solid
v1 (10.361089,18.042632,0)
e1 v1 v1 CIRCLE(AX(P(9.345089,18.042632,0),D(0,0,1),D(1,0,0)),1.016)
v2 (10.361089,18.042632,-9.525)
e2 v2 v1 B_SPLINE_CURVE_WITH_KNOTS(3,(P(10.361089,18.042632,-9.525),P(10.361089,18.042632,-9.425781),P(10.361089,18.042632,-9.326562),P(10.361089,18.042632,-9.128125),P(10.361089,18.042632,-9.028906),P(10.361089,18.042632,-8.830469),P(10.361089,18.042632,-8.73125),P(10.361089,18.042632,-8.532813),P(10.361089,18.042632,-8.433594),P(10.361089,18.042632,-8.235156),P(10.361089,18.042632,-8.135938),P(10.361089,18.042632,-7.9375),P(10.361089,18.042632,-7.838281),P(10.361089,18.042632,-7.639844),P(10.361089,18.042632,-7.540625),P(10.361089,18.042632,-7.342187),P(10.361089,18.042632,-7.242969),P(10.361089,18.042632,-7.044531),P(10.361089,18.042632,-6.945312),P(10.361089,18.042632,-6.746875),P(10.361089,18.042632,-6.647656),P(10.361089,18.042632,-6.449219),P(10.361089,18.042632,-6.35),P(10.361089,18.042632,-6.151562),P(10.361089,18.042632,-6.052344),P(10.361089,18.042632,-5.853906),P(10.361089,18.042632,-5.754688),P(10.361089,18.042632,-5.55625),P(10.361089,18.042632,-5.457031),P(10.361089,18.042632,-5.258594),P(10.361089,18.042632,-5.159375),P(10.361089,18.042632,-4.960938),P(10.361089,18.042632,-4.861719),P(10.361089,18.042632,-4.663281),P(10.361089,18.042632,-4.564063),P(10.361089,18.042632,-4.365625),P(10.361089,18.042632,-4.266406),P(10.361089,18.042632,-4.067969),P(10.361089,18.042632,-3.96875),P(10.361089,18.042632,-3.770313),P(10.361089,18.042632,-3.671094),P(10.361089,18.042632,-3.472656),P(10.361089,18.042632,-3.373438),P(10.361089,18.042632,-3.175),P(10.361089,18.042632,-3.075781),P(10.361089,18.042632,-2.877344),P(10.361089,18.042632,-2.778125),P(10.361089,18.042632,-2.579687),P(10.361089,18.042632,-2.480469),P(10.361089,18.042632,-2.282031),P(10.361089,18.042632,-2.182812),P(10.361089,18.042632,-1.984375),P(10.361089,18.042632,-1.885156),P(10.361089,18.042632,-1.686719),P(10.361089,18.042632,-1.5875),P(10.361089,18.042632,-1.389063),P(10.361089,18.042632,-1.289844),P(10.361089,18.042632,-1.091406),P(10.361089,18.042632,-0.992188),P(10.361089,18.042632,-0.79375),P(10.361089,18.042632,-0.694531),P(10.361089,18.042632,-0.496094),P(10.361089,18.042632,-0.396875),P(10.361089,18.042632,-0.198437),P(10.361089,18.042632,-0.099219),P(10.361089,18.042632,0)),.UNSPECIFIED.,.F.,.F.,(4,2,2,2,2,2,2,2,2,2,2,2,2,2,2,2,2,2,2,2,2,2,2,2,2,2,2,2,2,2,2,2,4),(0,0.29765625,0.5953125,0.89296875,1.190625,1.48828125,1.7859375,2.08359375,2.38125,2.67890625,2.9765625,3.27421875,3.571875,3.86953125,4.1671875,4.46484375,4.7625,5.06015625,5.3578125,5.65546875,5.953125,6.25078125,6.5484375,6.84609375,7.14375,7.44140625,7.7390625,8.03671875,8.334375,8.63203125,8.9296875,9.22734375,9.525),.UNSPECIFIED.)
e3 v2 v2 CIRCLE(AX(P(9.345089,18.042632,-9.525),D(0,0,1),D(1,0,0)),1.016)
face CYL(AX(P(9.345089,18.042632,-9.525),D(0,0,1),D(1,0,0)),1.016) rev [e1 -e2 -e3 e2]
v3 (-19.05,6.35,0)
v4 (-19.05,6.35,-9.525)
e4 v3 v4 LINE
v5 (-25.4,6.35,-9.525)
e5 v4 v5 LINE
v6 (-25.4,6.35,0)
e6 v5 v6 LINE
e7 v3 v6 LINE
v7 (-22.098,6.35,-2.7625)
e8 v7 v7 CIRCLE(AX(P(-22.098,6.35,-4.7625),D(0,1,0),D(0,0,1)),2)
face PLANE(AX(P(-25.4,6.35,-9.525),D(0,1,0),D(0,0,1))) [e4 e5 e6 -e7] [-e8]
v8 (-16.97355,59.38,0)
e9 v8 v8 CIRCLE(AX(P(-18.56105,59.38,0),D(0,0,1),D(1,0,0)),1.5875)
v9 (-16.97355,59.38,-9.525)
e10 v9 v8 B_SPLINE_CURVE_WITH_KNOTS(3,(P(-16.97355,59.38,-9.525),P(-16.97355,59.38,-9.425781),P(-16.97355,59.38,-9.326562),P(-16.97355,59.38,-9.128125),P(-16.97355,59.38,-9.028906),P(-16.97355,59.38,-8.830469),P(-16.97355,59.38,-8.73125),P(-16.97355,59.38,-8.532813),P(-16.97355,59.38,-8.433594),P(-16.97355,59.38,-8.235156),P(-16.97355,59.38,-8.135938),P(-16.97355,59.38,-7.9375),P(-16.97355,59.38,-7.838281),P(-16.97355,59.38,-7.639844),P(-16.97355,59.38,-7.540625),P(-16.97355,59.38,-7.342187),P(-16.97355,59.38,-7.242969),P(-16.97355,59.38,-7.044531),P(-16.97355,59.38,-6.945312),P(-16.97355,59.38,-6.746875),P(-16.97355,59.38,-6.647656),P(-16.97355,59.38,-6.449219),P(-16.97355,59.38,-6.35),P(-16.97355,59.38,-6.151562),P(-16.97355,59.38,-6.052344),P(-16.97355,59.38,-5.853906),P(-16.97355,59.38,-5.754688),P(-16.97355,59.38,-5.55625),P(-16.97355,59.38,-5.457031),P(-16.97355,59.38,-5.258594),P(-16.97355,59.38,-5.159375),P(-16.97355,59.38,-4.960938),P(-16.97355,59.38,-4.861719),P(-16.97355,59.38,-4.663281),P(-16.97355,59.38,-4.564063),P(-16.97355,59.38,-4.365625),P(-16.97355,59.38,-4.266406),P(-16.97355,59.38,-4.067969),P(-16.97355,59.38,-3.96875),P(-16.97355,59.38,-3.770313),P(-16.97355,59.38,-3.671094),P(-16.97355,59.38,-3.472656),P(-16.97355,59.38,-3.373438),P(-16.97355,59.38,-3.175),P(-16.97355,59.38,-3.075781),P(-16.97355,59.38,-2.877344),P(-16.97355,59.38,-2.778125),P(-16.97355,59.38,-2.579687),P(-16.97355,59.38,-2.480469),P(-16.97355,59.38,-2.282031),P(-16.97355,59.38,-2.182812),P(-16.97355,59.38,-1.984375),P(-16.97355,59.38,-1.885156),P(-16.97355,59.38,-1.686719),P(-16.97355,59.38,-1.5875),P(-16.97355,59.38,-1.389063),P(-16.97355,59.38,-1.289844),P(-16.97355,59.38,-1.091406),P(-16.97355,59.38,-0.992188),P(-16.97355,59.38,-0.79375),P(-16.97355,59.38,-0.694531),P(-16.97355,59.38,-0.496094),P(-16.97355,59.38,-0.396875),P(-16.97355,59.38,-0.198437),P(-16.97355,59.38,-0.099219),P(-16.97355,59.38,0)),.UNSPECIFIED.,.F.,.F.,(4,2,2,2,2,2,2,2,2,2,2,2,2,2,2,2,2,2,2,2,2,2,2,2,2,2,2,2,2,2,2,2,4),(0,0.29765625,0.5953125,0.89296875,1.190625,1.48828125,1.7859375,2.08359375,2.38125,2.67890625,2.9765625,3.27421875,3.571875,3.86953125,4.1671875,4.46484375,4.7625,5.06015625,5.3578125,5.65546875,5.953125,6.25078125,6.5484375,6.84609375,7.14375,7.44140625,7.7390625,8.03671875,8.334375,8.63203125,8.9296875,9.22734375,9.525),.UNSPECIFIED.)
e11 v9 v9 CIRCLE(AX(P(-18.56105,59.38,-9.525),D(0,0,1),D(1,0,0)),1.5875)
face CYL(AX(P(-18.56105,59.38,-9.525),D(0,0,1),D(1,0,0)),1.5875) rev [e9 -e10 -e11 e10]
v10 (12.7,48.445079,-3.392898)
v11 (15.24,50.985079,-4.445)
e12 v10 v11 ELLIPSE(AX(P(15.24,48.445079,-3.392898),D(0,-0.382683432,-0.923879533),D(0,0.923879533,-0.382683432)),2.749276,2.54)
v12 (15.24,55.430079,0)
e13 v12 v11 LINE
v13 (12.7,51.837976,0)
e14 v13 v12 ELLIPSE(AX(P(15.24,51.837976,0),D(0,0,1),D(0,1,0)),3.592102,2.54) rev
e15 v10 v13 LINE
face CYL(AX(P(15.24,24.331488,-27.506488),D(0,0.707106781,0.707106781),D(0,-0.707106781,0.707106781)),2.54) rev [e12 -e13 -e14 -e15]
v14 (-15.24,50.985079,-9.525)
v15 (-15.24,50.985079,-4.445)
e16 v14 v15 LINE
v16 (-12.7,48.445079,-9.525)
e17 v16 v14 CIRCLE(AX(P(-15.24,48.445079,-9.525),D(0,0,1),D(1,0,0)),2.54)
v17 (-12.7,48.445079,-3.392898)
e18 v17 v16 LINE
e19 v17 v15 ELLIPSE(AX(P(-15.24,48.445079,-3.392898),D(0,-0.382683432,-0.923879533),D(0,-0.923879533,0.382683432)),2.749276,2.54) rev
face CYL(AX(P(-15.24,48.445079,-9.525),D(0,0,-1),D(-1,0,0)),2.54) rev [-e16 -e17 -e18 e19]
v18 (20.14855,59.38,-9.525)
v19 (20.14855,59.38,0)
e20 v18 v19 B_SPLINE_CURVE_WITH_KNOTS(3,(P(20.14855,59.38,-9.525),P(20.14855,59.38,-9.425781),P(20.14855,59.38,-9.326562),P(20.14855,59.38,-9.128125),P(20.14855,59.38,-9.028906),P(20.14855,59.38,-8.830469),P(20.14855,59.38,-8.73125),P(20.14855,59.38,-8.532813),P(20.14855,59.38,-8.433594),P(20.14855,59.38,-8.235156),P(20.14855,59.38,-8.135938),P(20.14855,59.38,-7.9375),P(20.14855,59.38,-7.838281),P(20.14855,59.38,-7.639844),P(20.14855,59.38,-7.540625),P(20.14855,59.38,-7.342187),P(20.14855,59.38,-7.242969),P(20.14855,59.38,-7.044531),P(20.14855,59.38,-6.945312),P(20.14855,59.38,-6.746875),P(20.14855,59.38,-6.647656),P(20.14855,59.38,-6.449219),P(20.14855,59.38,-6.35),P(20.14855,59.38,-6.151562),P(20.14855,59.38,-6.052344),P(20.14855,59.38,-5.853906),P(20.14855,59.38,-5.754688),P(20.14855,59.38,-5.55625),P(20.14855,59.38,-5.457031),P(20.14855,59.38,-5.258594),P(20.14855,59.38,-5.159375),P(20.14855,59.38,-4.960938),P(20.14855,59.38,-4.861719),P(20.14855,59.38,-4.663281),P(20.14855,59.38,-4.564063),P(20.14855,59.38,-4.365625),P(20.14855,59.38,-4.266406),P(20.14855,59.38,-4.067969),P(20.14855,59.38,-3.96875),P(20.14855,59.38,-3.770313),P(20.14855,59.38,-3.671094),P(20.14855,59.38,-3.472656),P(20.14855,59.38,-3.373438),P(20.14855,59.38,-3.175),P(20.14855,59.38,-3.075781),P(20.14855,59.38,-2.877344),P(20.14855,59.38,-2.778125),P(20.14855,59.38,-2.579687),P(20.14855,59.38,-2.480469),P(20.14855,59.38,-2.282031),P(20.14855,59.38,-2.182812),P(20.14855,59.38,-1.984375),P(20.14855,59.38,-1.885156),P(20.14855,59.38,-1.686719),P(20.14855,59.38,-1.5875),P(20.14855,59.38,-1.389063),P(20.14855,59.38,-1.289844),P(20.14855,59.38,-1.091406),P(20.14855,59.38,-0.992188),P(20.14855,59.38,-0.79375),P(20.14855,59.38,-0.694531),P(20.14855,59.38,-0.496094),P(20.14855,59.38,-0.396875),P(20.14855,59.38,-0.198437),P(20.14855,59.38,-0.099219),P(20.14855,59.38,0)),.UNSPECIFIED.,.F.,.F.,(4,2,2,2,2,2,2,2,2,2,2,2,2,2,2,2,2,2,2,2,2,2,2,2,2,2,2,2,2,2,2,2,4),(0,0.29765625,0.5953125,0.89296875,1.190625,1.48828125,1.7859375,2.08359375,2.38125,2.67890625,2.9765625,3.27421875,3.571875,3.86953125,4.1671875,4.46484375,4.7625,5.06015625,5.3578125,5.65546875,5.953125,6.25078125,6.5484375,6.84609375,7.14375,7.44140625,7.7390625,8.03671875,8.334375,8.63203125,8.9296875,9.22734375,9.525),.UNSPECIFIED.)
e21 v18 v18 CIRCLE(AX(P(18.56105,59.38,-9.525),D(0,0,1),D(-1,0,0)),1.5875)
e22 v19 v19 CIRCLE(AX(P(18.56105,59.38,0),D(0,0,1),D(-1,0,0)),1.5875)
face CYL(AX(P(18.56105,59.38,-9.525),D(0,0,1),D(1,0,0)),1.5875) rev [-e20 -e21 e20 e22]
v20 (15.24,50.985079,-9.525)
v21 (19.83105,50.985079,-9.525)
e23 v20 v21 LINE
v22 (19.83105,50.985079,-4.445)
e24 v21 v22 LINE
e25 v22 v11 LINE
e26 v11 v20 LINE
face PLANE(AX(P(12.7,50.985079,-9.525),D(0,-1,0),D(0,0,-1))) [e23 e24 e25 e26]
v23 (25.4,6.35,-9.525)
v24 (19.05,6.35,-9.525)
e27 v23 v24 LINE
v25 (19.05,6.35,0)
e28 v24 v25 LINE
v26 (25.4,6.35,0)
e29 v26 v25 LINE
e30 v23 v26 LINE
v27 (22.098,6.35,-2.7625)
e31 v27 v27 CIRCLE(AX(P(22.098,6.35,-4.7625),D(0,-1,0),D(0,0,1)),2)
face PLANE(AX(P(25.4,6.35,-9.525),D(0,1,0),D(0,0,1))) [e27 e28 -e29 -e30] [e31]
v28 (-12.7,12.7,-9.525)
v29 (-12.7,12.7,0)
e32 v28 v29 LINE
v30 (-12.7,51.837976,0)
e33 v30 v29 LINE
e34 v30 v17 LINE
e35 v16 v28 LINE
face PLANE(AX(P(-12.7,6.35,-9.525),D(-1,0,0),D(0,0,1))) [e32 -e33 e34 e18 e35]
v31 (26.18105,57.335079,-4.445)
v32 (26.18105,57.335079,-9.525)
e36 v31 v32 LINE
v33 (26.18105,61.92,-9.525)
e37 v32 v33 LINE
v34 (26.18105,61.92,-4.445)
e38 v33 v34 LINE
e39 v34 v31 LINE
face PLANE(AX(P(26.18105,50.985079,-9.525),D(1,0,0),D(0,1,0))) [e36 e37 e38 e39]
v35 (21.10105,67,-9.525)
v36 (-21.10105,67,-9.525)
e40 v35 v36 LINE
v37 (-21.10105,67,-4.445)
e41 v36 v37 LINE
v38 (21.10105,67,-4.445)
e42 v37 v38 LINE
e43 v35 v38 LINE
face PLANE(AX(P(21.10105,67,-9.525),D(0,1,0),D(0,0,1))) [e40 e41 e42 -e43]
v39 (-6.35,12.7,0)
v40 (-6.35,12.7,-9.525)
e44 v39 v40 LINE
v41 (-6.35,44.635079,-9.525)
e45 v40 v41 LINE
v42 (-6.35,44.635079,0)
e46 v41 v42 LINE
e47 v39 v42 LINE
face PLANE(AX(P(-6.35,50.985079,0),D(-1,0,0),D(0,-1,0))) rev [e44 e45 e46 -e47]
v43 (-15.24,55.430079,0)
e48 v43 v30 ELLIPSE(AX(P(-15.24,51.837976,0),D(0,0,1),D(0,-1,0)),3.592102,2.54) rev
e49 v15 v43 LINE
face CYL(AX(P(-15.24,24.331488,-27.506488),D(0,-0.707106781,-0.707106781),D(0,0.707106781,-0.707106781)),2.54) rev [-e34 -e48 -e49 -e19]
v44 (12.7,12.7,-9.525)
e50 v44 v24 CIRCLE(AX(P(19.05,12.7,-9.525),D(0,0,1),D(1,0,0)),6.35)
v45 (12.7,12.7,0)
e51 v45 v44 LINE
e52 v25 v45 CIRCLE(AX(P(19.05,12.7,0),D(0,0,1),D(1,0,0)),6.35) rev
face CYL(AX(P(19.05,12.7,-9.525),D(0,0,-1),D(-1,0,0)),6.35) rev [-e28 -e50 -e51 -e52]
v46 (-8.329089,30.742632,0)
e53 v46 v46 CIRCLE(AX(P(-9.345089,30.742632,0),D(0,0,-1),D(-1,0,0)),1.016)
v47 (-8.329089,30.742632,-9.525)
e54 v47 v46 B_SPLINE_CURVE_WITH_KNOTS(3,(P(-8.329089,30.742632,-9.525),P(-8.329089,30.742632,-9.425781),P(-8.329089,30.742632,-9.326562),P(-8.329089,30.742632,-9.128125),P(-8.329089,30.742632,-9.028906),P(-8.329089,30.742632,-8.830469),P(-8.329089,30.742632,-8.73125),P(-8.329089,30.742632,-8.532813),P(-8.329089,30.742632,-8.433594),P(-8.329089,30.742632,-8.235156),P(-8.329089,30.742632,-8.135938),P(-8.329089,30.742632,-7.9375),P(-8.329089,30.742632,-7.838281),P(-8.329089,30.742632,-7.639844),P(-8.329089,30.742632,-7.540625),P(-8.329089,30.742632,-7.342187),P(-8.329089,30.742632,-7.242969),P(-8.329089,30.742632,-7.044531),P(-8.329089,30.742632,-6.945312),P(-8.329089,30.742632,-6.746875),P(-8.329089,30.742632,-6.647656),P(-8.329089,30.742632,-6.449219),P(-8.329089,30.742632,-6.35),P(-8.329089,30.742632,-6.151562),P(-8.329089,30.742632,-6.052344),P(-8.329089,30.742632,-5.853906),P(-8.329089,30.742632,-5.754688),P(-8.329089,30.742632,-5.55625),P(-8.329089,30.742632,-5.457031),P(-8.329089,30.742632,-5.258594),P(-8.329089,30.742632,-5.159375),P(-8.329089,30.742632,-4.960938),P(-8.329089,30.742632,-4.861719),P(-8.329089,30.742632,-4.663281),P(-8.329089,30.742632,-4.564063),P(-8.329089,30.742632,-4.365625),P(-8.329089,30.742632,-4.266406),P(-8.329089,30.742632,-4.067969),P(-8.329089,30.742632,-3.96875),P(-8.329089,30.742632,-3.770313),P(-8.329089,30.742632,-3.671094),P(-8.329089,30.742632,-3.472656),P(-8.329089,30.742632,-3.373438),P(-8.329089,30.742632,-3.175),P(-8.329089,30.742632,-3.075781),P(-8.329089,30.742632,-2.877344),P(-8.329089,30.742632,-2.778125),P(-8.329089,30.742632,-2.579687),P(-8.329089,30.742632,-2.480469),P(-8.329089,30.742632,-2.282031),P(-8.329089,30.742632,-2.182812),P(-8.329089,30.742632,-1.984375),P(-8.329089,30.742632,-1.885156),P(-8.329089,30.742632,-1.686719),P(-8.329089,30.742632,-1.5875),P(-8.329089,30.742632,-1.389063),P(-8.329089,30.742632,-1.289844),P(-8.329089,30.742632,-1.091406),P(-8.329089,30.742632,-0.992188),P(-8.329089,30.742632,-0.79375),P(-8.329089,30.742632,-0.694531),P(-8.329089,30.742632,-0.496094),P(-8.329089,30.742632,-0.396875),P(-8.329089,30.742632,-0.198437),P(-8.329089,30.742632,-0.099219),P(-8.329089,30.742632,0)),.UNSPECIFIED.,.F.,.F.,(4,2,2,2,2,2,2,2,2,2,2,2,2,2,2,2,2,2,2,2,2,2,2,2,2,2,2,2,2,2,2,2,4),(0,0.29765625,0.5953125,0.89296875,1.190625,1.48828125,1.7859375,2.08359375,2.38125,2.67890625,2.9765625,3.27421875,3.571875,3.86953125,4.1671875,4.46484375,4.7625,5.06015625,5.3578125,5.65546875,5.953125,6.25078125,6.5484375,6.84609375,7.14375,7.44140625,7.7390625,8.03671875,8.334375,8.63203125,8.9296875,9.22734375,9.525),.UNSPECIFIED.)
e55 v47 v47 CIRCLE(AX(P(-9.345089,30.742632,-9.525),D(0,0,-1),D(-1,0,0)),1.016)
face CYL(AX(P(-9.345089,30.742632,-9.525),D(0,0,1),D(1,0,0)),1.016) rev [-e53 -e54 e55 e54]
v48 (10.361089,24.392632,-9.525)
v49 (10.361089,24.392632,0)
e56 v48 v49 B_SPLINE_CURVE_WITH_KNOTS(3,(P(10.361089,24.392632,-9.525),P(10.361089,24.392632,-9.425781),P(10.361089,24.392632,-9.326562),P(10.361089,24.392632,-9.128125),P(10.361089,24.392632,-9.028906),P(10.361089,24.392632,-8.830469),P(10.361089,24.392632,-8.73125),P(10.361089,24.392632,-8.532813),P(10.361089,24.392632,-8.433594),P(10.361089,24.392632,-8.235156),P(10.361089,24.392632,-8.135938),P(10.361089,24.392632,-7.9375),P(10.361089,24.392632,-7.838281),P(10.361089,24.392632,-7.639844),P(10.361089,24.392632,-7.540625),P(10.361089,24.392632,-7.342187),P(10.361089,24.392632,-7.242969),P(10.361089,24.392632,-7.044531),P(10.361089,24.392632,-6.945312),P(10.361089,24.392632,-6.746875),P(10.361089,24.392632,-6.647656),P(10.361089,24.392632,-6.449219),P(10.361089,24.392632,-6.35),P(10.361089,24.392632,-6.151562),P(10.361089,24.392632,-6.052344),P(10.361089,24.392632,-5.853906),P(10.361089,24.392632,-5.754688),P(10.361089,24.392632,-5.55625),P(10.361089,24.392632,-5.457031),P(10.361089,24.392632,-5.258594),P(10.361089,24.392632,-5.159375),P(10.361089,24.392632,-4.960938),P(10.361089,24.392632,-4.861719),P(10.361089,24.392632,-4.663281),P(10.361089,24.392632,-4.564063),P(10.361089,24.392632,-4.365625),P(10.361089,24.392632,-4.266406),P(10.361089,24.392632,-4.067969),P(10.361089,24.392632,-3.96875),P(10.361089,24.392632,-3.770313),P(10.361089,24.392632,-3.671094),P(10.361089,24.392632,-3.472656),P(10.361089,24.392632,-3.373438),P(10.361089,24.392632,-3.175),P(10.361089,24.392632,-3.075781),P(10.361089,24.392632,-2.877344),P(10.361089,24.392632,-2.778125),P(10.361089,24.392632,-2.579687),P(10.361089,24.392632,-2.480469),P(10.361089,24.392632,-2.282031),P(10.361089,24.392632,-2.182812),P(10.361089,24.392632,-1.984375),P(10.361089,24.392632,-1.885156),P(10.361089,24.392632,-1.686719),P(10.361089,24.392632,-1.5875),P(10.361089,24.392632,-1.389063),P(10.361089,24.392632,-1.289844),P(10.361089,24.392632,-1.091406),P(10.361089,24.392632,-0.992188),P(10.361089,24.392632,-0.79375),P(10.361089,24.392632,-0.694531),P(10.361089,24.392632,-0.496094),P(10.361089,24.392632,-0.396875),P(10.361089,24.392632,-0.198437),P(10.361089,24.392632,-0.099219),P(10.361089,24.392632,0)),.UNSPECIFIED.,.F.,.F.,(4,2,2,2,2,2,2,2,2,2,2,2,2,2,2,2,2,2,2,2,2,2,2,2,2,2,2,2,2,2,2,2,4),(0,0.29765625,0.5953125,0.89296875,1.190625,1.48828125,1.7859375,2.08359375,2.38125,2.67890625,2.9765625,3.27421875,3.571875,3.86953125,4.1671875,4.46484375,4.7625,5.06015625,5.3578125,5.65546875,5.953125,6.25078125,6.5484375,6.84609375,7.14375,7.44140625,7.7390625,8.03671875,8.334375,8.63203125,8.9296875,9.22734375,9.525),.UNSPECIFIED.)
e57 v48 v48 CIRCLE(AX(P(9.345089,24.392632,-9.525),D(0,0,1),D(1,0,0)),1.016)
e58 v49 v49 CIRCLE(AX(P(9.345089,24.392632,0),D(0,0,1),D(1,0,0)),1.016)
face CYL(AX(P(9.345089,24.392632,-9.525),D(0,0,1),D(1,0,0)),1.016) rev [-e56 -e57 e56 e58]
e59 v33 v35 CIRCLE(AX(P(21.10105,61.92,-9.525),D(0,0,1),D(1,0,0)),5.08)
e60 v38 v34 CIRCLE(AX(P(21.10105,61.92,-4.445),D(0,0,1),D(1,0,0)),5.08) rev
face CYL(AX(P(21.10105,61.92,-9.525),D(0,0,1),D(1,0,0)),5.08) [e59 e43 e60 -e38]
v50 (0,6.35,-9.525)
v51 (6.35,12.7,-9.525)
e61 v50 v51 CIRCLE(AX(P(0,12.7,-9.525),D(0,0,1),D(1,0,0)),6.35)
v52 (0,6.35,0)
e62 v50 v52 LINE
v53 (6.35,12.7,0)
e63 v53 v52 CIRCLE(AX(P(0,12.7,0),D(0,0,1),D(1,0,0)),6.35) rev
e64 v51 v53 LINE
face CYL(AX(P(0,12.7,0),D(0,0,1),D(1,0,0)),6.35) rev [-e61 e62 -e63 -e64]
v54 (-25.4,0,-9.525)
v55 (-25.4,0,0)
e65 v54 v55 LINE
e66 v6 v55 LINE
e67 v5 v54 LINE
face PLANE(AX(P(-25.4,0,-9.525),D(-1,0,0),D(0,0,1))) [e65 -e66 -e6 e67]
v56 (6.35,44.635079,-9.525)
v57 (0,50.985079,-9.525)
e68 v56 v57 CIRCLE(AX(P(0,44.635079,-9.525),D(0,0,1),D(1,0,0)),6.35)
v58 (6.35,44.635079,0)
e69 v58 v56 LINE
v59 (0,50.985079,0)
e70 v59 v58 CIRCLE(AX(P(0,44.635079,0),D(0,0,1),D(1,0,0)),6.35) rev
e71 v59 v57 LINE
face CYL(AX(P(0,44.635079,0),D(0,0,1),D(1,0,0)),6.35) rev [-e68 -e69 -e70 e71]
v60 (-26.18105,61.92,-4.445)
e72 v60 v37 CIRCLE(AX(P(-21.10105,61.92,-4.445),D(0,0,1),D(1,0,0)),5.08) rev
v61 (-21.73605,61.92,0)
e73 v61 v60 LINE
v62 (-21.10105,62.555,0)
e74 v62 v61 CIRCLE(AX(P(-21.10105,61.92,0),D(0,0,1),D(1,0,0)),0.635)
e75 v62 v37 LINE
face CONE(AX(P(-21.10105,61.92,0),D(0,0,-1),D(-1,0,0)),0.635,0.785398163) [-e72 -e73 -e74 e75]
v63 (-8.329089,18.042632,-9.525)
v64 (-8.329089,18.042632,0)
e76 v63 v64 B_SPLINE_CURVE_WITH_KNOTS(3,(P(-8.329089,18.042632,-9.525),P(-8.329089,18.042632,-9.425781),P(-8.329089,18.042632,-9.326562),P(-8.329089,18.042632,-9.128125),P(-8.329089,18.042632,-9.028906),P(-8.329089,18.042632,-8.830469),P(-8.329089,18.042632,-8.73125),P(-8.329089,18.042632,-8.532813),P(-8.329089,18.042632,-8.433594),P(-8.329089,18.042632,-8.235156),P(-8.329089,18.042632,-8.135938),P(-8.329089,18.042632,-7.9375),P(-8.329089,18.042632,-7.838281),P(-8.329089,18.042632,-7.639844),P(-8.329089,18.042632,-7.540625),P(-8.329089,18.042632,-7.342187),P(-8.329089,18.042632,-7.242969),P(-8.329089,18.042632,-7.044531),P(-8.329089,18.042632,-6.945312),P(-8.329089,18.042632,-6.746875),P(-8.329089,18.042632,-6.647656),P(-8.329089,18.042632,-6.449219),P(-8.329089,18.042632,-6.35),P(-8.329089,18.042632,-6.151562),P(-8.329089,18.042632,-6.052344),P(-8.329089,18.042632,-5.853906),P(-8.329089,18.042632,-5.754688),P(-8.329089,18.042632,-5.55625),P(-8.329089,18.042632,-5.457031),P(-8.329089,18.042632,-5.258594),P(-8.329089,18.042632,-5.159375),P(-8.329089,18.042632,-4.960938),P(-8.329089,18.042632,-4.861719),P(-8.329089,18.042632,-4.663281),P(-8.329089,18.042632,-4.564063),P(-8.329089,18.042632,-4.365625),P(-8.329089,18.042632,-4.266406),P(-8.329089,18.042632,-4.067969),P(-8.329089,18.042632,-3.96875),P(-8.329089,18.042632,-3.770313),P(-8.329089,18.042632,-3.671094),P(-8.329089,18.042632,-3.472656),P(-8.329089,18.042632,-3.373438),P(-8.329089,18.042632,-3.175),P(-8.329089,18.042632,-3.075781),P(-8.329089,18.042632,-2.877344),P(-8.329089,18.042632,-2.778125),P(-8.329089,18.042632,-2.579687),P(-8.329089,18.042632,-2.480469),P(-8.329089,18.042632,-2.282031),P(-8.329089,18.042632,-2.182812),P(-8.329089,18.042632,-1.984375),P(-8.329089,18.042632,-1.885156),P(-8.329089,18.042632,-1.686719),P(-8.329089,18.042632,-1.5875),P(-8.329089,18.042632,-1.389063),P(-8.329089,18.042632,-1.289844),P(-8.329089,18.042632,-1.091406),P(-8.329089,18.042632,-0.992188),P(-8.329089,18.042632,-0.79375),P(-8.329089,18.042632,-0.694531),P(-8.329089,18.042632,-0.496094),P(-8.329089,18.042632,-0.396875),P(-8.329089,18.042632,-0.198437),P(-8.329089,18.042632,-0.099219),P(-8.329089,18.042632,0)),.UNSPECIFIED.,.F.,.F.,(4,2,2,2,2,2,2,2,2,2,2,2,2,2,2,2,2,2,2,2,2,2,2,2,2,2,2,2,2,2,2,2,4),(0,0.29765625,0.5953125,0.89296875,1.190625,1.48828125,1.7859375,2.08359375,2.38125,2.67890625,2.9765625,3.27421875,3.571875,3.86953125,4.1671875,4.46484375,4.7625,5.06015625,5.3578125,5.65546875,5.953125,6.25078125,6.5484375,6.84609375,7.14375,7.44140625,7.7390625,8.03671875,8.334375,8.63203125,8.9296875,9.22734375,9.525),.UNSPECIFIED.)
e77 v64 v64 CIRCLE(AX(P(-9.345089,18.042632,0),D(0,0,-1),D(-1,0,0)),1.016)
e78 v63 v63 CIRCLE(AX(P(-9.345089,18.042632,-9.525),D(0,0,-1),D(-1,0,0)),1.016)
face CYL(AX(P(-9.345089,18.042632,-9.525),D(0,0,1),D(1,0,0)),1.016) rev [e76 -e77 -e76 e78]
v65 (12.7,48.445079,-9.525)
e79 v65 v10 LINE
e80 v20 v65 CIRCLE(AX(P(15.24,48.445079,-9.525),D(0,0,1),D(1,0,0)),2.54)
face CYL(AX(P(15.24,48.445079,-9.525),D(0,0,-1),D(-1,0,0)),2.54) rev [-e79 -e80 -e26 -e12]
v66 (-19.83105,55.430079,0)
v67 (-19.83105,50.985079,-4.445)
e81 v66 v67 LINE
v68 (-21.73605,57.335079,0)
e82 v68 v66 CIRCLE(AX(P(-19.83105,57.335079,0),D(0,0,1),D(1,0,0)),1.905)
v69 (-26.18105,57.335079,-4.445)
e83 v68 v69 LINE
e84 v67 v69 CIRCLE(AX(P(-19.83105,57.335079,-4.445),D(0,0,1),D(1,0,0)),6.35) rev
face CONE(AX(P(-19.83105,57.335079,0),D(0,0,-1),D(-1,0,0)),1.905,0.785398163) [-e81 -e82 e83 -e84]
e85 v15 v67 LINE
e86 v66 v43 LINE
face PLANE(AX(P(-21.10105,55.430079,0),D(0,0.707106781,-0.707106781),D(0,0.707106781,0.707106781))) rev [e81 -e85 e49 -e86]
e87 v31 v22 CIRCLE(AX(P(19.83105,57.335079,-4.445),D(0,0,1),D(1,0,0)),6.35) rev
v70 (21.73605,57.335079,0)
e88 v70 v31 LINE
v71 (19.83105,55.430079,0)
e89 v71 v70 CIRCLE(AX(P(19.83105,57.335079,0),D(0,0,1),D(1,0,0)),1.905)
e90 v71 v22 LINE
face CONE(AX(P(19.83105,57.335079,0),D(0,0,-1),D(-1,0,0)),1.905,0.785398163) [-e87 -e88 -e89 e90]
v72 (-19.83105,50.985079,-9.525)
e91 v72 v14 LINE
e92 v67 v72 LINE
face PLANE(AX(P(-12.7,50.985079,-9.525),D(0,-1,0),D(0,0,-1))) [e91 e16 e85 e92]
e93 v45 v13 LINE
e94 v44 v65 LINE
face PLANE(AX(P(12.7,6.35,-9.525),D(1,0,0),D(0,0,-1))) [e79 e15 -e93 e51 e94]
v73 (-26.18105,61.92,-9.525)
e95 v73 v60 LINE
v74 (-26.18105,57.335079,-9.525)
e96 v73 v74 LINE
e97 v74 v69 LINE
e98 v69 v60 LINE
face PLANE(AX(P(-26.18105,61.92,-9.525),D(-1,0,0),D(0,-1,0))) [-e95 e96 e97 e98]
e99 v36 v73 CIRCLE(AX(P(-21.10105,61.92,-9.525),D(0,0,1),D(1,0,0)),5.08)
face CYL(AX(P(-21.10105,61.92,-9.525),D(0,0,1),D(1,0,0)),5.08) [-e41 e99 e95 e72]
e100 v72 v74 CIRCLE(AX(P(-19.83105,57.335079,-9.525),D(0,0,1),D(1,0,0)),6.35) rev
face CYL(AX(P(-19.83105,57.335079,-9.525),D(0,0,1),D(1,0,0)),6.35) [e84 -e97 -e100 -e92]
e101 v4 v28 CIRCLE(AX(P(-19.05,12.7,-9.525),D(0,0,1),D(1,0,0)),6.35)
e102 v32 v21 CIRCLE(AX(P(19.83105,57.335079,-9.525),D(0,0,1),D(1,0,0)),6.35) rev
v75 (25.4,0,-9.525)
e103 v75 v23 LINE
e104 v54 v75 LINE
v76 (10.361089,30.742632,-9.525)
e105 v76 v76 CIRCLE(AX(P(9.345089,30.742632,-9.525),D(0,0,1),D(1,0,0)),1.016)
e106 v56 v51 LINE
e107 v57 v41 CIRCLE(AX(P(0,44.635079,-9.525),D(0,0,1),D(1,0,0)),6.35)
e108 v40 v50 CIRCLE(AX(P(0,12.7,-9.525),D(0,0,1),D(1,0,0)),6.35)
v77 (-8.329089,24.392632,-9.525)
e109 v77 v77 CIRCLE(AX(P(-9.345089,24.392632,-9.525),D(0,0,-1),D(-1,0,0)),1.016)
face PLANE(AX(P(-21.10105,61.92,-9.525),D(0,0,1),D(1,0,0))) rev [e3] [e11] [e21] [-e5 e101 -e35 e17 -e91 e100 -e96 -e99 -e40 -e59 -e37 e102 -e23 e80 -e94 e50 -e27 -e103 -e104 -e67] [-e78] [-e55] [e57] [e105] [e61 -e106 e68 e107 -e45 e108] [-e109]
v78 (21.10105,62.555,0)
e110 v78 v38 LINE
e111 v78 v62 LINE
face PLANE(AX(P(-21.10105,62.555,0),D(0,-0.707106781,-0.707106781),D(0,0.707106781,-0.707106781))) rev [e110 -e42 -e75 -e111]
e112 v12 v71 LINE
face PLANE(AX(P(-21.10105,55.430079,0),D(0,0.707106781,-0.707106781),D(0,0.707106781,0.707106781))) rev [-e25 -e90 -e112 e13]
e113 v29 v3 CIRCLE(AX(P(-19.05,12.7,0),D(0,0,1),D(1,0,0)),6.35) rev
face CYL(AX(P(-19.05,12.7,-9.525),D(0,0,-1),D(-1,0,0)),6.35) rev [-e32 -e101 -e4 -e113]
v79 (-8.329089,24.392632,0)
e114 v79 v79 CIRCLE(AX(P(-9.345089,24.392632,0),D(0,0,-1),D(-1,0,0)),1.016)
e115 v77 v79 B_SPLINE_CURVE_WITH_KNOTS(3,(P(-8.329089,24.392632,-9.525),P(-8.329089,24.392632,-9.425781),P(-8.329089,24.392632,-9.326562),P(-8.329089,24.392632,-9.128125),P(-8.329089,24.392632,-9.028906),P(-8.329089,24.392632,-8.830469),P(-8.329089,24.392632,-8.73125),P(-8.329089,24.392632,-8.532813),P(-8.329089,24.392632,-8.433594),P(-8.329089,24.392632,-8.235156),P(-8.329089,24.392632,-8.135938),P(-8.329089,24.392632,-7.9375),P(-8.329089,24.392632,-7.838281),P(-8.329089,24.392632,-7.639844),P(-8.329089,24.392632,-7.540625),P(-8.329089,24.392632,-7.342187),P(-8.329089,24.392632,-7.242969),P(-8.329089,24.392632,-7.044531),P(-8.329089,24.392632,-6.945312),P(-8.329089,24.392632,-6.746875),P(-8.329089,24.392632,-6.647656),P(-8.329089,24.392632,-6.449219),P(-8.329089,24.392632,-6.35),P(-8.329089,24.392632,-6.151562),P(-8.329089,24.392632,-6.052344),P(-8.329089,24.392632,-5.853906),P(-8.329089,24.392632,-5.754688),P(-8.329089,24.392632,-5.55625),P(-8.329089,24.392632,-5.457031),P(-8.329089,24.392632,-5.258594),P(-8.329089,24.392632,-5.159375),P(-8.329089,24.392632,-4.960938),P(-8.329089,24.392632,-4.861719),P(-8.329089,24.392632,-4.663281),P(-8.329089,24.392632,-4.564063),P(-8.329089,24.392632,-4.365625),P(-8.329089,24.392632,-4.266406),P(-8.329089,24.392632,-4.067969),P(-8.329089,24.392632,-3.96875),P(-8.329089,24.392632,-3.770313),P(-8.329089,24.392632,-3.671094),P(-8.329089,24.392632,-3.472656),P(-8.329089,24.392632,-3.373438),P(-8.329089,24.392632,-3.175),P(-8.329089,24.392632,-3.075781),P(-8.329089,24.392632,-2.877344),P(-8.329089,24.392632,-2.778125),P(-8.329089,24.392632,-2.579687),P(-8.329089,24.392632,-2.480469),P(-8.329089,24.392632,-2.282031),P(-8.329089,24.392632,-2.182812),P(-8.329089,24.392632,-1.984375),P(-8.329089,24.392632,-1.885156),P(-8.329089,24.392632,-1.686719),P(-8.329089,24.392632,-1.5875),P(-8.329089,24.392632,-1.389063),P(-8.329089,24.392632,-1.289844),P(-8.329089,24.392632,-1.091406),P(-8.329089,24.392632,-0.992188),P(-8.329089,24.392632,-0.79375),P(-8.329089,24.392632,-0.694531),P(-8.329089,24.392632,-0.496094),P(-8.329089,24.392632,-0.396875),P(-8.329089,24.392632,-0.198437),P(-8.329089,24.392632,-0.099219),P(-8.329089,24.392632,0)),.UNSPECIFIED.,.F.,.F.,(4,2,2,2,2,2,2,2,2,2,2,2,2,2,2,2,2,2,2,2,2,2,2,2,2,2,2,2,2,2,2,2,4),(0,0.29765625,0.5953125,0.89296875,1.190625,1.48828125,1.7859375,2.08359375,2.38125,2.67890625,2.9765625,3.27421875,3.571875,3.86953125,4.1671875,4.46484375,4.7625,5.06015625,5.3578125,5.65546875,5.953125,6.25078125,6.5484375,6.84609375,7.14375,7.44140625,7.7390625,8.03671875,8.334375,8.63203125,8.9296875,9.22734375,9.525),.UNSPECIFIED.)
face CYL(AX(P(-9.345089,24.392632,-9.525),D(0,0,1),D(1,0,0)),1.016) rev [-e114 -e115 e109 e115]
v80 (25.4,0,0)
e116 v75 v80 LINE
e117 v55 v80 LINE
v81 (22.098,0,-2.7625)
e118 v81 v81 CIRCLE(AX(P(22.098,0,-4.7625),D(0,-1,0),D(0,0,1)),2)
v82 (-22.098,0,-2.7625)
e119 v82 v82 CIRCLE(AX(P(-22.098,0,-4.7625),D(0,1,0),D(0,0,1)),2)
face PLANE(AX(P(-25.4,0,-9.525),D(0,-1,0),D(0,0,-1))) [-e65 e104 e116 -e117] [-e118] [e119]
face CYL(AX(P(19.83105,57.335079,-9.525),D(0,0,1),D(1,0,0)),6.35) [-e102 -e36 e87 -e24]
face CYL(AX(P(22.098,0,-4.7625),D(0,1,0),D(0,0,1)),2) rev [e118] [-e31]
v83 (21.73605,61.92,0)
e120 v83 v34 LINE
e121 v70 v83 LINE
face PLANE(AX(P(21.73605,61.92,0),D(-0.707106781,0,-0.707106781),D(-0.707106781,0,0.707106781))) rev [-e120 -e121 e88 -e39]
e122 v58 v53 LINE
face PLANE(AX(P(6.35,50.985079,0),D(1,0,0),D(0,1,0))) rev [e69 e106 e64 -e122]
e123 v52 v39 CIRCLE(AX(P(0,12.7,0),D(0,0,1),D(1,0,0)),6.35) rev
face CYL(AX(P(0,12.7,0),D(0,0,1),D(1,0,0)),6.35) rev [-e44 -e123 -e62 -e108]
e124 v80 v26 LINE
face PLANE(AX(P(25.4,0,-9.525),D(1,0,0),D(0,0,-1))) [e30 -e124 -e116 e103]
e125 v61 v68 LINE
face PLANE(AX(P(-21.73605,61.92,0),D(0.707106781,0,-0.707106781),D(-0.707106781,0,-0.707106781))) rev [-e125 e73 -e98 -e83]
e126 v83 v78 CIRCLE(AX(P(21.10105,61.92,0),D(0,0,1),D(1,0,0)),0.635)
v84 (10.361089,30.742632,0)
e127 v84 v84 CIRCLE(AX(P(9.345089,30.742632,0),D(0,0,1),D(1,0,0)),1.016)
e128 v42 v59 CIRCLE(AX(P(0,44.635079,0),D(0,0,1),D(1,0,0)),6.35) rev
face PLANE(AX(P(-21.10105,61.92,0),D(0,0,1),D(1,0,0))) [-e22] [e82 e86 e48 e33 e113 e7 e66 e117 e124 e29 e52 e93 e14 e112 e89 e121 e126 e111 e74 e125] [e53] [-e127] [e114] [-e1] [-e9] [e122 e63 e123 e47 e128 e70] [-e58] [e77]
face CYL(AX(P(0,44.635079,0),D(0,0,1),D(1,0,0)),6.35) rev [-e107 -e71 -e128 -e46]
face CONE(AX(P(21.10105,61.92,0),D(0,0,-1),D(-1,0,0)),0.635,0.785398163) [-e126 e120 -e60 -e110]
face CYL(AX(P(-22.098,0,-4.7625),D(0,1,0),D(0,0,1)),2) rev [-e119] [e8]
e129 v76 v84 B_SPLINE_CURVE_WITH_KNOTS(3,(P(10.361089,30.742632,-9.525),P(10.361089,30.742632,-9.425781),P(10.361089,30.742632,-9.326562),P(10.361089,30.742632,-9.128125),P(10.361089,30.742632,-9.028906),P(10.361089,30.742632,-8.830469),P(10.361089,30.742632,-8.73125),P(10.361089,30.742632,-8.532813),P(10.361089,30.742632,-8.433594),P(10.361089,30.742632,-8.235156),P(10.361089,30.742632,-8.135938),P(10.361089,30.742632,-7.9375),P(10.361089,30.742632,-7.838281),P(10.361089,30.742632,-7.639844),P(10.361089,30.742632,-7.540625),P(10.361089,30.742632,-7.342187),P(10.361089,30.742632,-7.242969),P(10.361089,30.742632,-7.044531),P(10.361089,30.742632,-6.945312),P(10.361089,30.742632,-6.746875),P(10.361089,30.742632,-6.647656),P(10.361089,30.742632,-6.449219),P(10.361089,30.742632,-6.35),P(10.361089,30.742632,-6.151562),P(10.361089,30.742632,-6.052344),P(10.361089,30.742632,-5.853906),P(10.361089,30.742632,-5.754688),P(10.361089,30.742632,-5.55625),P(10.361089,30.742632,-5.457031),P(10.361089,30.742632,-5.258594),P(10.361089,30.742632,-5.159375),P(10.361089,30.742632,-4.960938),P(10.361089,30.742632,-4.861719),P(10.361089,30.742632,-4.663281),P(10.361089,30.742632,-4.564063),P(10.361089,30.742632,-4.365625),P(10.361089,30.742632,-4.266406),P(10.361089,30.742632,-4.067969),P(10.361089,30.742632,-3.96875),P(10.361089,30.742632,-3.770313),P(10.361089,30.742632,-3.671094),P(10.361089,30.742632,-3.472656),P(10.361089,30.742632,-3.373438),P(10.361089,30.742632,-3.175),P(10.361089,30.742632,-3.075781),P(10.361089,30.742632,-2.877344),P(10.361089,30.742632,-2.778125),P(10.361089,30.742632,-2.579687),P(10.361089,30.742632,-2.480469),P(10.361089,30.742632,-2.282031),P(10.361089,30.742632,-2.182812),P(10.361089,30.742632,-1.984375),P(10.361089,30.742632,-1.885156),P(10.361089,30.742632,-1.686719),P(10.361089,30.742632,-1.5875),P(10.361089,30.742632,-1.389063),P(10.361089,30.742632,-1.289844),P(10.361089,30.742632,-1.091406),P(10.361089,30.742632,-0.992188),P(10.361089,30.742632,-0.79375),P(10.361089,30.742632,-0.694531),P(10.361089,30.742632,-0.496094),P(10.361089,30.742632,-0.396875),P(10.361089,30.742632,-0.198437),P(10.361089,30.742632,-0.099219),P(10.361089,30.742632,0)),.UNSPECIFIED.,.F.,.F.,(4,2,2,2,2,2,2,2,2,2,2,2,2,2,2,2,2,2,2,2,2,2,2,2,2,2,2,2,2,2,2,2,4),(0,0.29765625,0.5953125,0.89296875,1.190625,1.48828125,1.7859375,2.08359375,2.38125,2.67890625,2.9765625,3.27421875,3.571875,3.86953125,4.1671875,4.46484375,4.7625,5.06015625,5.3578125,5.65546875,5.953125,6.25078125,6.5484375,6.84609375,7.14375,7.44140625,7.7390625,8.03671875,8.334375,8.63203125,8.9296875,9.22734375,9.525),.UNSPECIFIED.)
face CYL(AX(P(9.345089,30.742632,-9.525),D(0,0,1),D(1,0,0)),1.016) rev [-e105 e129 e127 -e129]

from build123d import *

# Parameters (mm, degrees)
SKETCH1_R                 = 1.5875
EXTRUDE1_DEPTH            = 9.525
SKETCH2_W                 = 12.7
SKETCH2_H                 = 44.635078528
CUT_EXTRUDE1_DEPTH        = 73.561511865
FILLET1_R                 = 6.35
CHAMFER1_SIZE             = 4.445
FILLET2_R                 = 6.35
FILLET3_R                 = 6.35
SKETCH3_R                 = 2.000000064
CUT_EXTRUDE2_DEPTH        = 67.742756192
SKETCH4_R                 = 1.016
EXTRUDE2_DEPTH            = 73.561511865
LPATTERN1_COUNT           = 3
LPATTERN1_PITCH           = 6.35
LPATTERN1_COPY_1_SKETCH_R = 1.016
LPATTERN1_COPY_1_DEPTH    = 73.561511865
LPATTERN1_COPY_2_SKETCH_R = 1.016
LPATTERN1_COPY_2_DEPTH    = 73.561511865
FILLET5_R                 = 2.54


with BuildPart() as part:
    # Sketch1 → Extrude1 (new body)
    with BuildSketch(Plane.XY):
        with BuildLine():
            Line((26.18105, 50.985078528), (26.18105, 61.92))
            ThreePointArc((26.18105, 61.92), (24.693152448, 65.512102448), (21.10105, 67))
            Line((21.10105, 67), (-21.10105, 67))
            ThreePointArc((-21.10105, 67), (-24.693152448, 65.512102448), (-26.18105, 61.92))
            Line((-26.18105, 61.92), (-26.18105, 50.985078528))
            Line((-26.18105, 50.985078528), (-12.7, 50.985078528))
            Line((-12.7, 50.985078528), (-12.7, 6.35))
            Line((-12.7, 6.35), (-25.4, 6.35))
            Line((-25.4, 6.35), (-25.4, 0))
            Line((-25.4, 0), (25.4, 0))
            Line((25.4, 0), (25.4, 6.35))
            Line((25.4, 6.35), (12.7, 6.35))
            Line((12.7, 6.35), (12.7, 50.985078528))
            Line((12.7, 50.985078528), (26.18105, 50.985078528))
        make_face()
        with Locations((-18.56105, 59.38)):
            Circle(SKETCH1_R, mode=Mode.SUBTRACT)
        with Locations((18.56105, 59.38)):
            Circle(SKETCH1_R, mode=Mode.SUBTRACT)
    extrude(amount=-EXTRUDE1_DEPTH)

    # Sketch2 → Cut-Extrude1 (cut, through all)
    with BuildSketch(Plane(origin=(0, 0, -9.525), x_dir=(-1, 0, 0), z_dir=(0, 0, -1))):
        with Locations((0, 28.667539264)):
            Rectangle(SKETCH2_W, SKETCH2_H)
    extrude(amount=-CUT_EXTRUDE1_DEPTH, mode=Mode.SUBTRACT)

    # Fillet1
    fillet1_edges = [part.edges().sort_by_distance(p)[0] for p in [
        (-26.18105, 50.985078528, -4.7625),
        (26.18105, 50.985078528, -4.7625),
    ]]
    fillet(fillet1_edges, radius=FILLET1_R)

    # Chamfer1
    chamfer1_edges = [part.edges().sort_by_distance(p)[0] for p in [
        (-16.265525, 50.985078528, 0),
        (-26.18105, 59.627539264, 0),
        (16.265525, 50.985078528, 0),
        (0, 67, 0),
        (26.18105, 59.627539264, 0),
    ]]
    chamfer(chamfer1_edges, length=CHAMFER1_SIZE)

    # Fillet2
    fillet2_edges = [part.edges().sort_by_distance(p)[0] for p in [
        (6.35, 50.985078528, -4.7625),
        (-6.35, 50.985078528, -4.7625),
        (6.35, 6.35, -4.7625),
        (-6.35, 6.35, -4.7625),
    ]]
    fillet(fillet2_edges, radius=FILLET2_R - 0.0001)  # a hair under: the kernel refuses the full size

    # Fillet3
    fillet3_edges = [part.edges().sort_by_distance(p)[0] for p in [
        (-12.7, 6.35, -4.7625),
        (12.7, 6.35, -4.7625),
    ]]
    fillet(fillet3_edges, radius=FILLET3_R)

    # Sketch3 → Cut-Extrude2 (cut, through all)
    with BuildSketch(Plane(origin=(0, 6.35, 0), x_dir=(1, 0, 0), z_dir=(0, 1, 0))):
        with Locations(Location((-22.098, 4.7625, 0), (0, 0, 270))):
            Circle(SKETCH3_R)
    cut_extrude2 = extrude(amount=-CUT_EXTRUDE2_DEPTH, mode=Mode.SUBTRACT)

    # Mirror2: Cut-Extrude2 across plane
    add(cut_extrude2.mirror(Plane(origin=(0, 0, 0), x_dir=(0, 0, 1), z_dir=(1, 0, 0))), mode=Mode.SUBTRACT)

    # Sketch4 → Extrude2 (cut, through all)
    with BuildSketch(Plane.XY):
        with Locations((9.345089473, 30.742631811)):
            Circle(SKETCH4_R)
    extrude2 = extrude(amount=-EXTRUDE2_DEPTH, mode=Mode.SUBTRACT)

    # Mirror3: Extrude2 across plane
    add(extrude2.mirror(Plane(origin=(0, 0, 0), x_dir=(0, 0, 1), z_dir=(1, 0, 0))), mode=Mode.SUBTRACT)

    # LPattern1: Extrude2 ×3
    with Locations(*[(0, -i * LPATTERN1_PITCH, 0) for i in range(1, LPATTERN1_COUNT)]):
        add(extrude2, mode=Mode.SUBTRACT)

    # LPattern1 copy 1 sketch → LPattern1 copy 1 (cut, through all)
    with BuildSketch(Plane(origin=(0, -6.35, 0), x_dir=(-1, 0, 0), z_dir=(0, 0, 1))):
        with Locations((9.345089473, -30.742631811)):
            Circle(LPATTERN1_COPY_1_SKETCH_R)
    extrude(amount=-LPATTERN1_COPY_1_DEPTH, mode=Mode.SUBTRACT)

    # LPattern1 copy 2 sketch → LPattern1 copy 2 (cut, through all)
    with BuildSketch(Plane(origin=(0, -12.7, 0), x_dir=(-1, 0, 0), z_dir=(0, 0, 1))):
        with Locations((9.345089473, -30.742631811)):
            Circle(LPATTERN1_COPY_2_SKETCH_R)
    extrude(amount=-LPATTERN1_COPY_2_DEPTH, mode=Mode.SUBTRACT)

    # Fillet5
    fillet5_edges = [part.edges().sort_by_distance(p)[0] for p in [
        (-12.7, 50.985078528, -6.985),
        (12.7, 50.985078528, -6.985),
        (-12.7, 53.207578528, -2.2225),
        (12.7, 53.207578528, -2.2225),
    ]]
    fillet(fillet5_edges, radius=FILLET5_R)


solid = part.part
